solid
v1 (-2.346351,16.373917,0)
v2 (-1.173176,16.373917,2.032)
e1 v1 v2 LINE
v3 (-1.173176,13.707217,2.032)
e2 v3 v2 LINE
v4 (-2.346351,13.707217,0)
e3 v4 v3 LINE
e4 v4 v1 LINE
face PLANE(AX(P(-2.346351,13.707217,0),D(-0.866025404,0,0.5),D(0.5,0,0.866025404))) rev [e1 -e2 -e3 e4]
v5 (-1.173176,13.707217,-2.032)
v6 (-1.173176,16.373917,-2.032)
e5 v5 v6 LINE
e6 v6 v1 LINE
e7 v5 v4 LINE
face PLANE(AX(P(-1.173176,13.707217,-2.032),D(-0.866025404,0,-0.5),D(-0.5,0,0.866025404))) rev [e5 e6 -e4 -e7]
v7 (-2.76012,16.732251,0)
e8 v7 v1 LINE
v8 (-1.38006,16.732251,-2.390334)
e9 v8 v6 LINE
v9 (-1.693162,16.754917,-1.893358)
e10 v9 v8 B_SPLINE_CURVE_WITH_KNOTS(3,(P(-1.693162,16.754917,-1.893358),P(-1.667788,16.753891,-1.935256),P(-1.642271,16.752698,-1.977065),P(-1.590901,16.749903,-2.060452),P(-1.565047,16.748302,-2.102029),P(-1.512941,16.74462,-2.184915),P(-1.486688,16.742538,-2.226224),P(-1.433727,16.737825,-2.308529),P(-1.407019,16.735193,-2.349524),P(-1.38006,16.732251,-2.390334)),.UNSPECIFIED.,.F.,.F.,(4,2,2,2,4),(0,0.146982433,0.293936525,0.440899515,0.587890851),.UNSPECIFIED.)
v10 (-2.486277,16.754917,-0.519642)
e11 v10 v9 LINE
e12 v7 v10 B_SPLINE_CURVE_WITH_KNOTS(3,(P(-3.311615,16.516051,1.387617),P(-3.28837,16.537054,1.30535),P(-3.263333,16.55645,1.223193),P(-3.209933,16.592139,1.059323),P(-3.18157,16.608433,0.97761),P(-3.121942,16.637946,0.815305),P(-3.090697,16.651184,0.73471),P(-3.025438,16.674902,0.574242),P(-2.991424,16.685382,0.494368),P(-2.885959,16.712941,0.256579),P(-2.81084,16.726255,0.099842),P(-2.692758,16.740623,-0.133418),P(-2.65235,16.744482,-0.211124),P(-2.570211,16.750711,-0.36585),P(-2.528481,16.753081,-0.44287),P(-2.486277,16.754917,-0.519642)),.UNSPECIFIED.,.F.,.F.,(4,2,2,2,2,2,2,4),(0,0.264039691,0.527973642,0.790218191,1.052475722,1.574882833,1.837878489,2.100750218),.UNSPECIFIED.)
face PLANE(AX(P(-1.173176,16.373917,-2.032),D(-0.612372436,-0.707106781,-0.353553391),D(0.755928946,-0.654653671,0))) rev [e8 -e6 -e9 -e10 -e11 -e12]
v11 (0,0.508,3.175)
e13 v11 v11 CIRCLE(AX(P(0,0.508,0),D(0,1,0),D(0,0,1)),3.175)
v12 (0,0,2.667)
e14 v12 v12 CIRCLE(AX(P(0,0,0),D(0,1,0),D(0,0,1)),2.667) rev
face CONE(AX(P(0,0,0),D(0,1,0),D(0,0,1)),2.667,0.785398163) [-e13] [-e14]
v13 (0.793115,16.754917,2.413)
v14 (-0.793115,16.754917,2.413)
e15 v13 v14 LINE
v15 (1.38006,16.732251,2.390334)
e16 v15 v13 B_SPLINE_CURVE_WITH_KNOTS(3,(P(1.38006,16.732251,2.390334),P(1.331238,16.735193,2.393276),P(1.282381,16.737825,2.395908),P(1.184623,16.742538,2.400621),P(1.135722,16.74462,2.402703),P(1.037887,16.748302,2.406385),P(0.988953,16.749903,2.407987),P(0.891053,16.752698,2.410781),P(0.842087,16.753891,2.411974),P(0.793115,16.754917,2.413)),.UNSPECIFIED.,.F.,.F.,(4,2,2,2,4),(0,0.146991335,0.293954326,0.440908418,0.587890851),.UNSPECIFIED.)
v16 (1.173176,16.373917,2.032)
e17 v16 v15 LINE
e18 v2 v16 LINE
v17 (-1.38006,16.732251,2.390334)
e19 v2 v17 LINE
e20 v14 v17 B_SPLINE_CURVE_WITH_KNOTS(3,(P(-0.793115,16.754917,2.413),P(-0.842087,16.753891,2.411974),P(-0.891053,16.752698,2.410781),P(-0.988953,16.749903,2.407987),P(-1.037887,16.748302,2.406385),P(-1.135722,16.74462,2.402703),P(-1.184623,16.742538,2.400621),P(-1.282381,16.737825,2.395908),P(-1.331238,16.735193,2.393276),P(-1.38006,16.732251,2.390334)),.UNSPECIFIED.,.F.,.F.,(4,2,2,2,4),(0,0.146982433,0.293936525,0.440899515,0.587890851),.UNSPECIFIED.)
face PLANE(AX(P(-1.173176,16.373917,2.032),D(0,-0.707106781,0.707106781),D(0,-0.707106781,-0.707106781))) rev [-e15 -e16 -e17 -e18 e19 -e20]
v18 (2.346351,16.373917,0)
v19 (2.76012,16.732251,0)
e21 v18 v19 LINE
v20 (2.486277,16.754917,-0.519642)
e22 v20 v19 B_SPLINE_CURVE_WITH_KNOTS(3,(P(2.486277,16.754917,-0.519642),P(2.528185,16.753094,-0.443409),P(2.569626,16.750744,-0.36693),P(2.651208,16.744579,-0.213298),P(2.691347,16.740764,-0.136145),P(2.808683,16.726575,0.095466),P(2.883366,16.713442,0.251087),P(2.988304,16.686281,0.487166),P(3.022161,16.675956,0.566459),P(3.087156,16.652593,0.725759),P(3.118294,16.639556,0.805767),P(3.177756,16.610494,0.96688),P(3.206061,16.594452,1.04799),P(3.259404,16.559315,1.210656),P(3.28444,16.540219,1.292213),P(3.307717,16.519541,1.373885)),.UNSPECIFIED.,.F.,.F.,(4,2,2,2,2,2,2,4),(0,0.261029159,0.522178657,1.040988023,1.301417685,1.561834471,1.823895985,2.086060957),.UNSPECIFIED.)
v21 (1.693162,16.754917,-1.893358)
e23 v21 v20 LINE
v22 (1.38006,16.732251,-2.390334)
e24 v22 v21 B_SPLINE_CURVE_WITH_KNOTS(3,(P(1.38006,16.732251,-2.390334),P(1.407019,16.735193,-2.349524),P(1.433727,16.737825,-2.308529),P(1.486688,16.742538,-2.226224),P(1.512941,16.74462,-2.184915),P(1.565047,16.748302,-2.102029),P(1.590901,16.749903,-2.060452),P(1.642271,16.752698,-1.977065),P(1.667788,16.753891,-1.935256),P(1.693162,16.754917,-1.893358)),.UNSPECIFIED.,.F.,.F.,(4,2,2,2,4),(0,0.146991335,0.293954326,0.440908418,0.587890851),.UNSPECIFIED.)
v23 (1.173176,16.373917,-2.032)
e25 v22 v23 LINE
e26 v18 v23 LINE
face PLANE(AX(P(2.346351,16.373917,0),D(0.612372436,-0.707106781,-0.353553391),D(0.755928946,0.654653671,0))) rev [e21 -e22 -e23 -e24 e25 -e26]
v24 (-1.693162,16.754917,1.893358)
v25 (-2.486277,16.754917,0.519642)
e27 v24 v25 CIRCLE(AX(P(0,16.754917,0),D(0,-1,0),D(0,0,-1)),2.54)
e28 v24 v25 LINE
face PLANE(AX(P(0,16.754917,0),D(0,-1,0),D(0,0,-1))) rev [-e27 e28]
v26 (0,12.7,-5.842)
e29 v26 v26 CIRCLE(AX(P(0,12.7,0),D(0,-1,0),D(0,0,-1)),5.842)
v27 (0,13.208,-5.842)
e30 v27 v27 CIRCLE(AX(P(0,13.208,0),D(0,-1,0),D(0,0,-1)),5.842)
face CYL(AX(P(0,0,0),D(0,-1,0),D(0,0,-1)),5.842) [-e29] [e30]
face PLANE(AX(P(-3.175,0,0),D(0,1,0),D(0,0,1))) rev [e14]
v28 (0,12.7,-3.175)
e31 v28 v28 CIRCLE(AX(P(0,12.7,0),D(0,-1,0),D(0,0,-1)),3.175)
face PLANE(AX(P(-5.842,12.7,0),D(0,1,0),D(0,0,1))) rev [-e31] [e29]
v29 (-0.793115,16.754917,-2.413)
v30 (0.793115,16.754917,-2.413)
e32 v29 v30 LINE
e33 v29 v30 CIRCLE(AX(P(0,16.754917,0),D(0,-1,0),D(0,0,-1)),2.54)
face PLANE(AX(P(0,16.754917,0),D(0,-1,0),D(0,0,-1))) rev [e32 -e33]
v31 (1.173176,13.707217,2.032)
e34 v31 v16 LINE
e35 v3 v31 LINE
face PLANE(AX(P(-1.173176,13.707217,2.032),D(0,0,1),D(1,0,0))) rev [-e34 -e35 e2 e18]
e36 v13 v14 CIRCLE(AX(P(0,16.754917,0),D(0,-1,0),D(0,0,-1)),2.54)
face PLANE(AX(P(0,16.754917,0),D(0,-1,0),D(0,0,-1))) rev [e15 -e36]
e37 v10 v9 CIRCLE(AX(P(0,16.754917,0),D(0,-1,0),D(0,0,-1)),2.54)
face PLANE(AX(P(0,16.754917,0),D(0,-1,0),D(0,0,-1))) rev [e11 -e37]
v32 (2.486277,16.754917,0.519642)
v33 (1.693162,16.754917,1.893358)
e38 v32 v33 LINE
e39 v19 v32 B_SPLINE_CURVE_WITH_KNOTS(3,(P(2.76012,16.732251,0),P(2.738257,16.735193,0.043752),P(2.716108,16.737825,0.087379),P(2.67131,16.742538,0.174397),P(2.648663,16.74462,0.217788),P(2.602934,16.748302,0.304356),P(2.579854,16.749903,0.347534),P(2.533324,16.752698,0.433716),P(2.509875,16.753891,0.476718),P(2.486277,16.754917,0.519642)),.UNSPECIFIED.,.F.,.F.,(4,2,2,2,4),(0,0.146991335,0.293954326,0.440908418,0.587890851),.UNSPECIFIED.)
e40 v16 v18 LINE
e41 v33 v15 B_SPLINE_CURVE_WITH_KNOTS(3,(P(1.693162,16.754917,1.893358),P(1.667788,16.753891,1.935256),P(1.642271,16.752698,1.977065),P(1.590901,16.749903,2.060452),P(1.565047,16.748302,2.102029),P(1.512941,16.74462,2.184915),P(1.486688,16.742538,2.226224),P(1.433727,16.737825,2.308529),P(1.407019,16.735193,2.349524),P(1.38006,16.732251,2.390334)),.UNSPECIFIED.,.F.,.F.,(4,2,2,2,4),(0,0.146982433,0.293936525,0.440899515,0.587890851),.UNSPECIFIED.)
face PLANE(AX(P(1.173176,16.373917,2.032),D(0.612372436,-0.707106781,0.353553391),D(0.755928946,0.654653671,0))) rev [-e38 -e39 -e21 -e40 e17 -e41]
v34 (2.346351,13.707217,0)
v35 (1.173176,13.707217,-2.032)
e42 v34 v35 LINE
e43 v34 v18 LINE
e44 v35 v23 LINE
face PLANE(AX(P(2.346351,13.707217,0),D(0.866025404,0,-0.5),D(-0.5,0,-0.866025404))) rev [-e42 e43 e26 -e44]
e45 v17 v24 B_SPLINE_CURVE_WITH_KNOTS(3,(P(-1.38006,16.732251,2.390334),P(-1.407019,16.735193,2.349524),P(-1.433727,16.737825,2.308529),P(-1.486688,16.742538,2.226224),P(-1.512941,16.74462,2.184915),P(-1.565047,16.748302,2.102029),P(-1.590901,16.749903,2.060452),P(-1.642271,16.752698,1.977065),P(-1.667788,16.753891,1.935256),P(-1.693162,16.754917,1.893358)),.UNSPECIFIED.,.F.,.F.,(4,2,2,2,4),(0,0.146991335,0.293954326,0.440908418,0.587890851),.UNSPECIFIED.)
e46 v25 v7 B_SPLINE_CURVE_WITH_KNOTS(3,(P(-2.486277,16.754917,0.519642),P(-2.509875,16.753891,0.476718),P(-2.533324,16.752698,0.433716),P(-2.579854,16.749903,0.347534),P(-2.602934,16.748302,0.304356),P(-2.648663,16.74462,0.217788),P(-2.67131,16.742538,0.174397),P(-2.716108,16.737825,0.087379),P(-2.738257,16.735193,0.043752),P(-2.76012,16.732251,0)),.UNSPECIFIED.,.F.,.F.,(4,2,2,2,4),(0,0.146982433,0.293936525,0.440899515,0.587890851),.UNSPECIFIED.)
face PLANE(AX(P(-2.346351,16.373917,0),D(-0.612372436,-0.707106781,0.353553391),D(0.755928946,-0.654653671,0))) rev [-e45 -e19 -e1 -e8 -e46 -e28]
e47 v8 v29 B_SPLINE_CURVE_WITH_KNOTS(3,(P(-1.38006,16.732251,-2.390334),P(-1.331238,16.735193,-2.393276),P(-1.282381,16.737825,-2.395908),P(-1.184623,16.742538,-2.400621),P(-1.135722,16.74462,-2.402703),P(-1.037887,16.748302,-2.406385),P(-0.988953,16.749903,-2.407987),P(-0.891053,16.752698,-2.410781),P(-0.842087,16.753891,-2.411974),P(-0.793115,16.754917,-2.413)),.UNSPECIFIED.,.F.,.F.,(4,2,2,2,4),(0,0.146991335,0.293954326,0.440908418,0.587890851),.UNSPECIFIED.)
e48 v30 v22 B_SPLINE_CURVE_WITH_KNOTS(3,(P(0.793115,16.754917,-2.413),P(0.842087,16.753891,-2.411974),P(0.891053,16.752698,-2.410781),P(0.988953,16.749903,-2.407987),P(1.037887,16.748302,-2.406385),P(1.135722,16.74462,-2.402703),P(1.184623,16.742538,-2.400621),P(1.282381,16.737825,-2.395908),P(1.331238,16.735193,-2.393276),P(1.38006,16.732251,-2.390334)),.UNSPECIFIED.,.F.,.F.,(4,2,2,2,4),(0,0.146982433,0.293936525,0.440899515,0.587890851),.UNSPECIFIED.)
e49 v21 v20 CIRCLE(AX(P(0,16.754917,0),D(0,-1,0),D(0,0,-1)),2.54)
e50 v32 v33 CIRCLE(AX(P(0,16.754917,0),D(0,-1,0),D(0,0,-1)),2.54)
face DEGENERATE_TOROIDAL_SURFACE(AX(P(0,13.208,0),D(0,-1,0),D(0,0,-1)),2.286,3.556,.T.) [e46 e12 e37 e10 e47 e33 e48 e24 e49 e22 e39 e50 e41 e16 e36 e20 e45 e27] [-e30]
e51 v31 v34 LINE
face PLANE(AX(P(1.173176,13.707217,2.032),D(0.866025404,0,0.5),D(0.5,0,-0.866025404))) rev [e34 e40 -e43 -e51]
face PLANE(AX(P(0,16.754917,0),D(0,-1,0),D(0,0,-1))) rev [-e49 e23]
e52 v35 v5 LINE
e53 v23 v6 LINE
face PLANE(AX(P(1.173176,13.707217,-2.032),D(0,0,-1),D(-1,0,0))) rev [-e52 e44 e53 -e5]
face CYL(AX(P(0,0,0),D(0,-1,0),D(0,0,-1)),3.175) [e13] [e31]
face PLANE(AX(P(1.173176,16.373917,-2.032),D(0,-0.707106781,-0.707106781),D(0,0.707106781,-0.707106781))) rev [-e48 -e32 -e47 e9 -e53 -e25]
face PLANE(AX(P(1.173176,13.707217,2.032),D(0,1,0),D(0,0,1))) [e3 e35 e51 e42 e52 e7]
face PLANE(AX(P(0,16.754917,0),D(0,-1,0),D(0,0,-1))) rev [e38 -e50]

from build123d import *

# Parameters (mm, degrees)
EXTRUDE1_DEPTH = 3.0477
CHAMFER1_SIZE  = 0.381
CHAMFER2_SIZE  = 0.381
CHAMFER3_SIZE  = 0.508


with BuildPart() as part:
    # Sketch1 → Revolve1 (revolve)
    with BuildSketch(Plane.XY, mode=Mode.PRIVATE) as revolve1_sk:
        with BuildLine():
            Line((0, 16.754916971), (-2.54, 16.754916971))
            ThreePointArc((-2.54, 16.754916971), (-4.888725495, 15.631005572), (-5.842, 13.208))
            Line((-5.842, 13.208), (-5.842, 12.7))
            Line((-5.842, 12.7), (-3.175, 12.7))
            Line((-3.175, 12.7), (-3.175, 0))
            Line((-3.175, 0), (0, 0))
            Line((0, 0), (0, 16.754916971))
        make_face()
    revolve(revolve1_sk.sketch.rotate(Axis((0, 0, 0), (0, 1, 0)), 270), axis=Axis((0, 0, 0), (0, 1, 0)))

    # Sketch2 → Extrude1 (cut)
    with BuildSketch(Plane(origin=(0, 16.754916971, 0), x_dir=(1, 0, 0), z_dir=(0, 1, 0))):
        Polygon((1.173175747, -2.032), (2.346351494, 0), (1.173175747, 2.032), (-1.173175747, 2.032), (-2.346351494, 0), (-1.173175747, -2.032), align=None)
    extrude(amount=-EXTRUDE1_DEPTH, mode=Mode.SUBTRACT)

    # Chamfer1
    # the kernel refuses this chamfer: 0.381 mm, written as the material it takes off along each edge
    with BuildSketch(Plane(origin=(2.836257103, 16.754916971, 0.848541406), x_dir=(0.8656979742248802, 0.02749587661058275, -0.4998109584556487), z_dir=(-0.5000000000000003, 0, -0.8660254037844386))) as chamfer1_piece_1_section:
        Polygon((CHAMFER1_SIZE * 0.999621916911, CHAMFER1_SIZE * 0.0274958766106), (-CHAMFER1_SIZE * 0.0274958766106, CHAMFER1_SIZE * 0.999621916911), (0, 0), align=None)
    chamfer1_piece_1 = extrude(amount=4.305973931, mode=Mode.PRIVATE)
    chamfer1_piece_1 = split(chamfer1_piece_1, bisect_by=Plane(origin=(1.86439326, 16.626680536, -2.032), z_dir=(0, 0, 1)), keep=Keep.TOP, mode=Mode.PRIVATE)
    chamfer1_piece_1 = split(chamfer1_piece_1, bisect_by=Plane(origin=(2.691960251, 16.626680536, -0.598611926), z_dir=(-0.8660254037844386, 0, -0.5000000000000002)), keep=Keep.TOP, mode=Mode.PRIVATE)
    add(chamfer1_piece_1, mode=Mode.SUBTRACT)
    with BuildSketch(Plane(origin=(2.152986965, 16.754916971, -2.032), x_dir=(0, 0.027495876610582747, -0.9996219169112968), z_dir=(-1, 0, 0))) as chamfer1_piece_2_section:
        Polygon((CHAMFER1_SIZE * 0.999621916911, CHAMFER1_SIZE * 0.0274958766106), (-CHAMFER1_SIZE * 0.0274958766106, CHAMFER1_SIZE * 0.999621916911), (0, 0), align=None)
    chamfer1_piece_2 = extrude(amount=4.305973931, mode=Mode.PRIVATE)
    chamfer1_piece_2 = split(chamfer1_piece_2, bisect_by=Plane(origin=(-0.82756699, 16.626680536, -2.630611926), z_dir=(0.8660254037844386, 0, 0.5000000000000001)), keep=Keep.TOP, mode=Mode.PRIVATE)
    chamfer1_piece_2 = split(chamfer1_piece_2, bisect_by=Plane(origin=(0.82756699, 16.626680536, -2.630611926), z_dir=(-0.8660254037844387, 0, 0.5000000000000003)), keep=Keep.TOP, mode=Mode.PRIVATE)
    add(chamfer1_piece_2, mode=Mode.SUBTRACT)
    with BuildSketch(Plane(origin=(-0.683270138, 16.754916971, -2.880541406), x_dir=(-0.8656979742248804, 0.02749587661058275, -0.4998109584556485), z_dir=(-0.5000000000000001, 0, 0.8660254037844386))) as chamfer1_piece_3_section:
        Polygon((CHAMFER1_SIZE * 0.999621916911, CHAMFER1_SIZE * 0.0274958766106), (-CHAMFER1_SIZE * 0.0274958766106, CHAMFER1_SIZE * 0.999621916911), (0, 0), align=None)
    chamfer1_piece_3 = extrude(amount=4.305973931, mode=Mode.PRIVATE)
    chamfer1_piece_3 = split(chamfer1_piece_3, bisect_by=Plane(origin=(-2.691960251, 16.626680536, -0.598611926), z_dir=(0.8660254037844387, 0, -0.5000000000000001)), keep=Keep.TOP, mode=Mode.PRIVATE)
    chamfer1_piece_3 = split(chamfer1_piece_3, bisect_by=Plane(origin=(-1.86439326, 16.626680536, -2.032), z_dir=(0, 0, 1)), keep=Keep.TOP, mode=Mode.PRIVATE)
    add(chamfer1_piece_3, mode=Mode.SUBTRACT)
    with BuildSketch(Plane(origin=(2.152986965, 16.754916971, -2.032), x_dir=(0, 0.027495876610582747, -0.9996219169112968), z_dir=(-1, 0, 0))) as chamfer1_piece_4a_section:
        Polygon((CHAMFER1_SIZE * 0.999621916911, CHAMFER1_SIZE * 0.0274958766106), (-CHAMFER1_SIZE * 0.0274958766106, CHAMFER1_SIZE * 0.999621916911), (0, 0), align=None)
    chamfer1_piece_4a = extrude(amount=4.305973931, mode=Mode.PRIVATE)
    chamfer1_piece_4a = split(chamfer1_piece_4a, bisect_by=Plane(origin=(1.229620554, 16.631969248, -1.934234726), z_dir=(0.8660254037844387, 0, -0.5000000000000003)), keep=Keep.TOP, mode=Mode.PRIVATE)
    with BuildSketch(Plane(origin=(2.836257103, 16.754916971, 0.848541406), x_dir=(0.8656979742248802, 0.02749587661058275, -0.4998109584556487), z_dir=(-0.5000000000000003, 0, -0.8660254037844386))) as chamfer1_piece_4b_section:
        Polygon((CHAMFER1_SIZE * 0.999621916911, CHAMFER1_SIZE * 0.0274958766106), (-CHAMFER1_SIZE * 0.0274958766106, CHAMFER1_SIZE * 0.999621916911), (0, 0), align=None)
    chamfer1_piece_4b = extrude(amount=4.305973931, mode=Mode.PRIVATE)
    chamfer1_piece_4b = split(chamfer1_piece_4b, bisect_by=Plane(origin=(1.060286133, 16.631969248, -2.032), z_dir=(0, 0, -1)), keep=Keep.TOP, mode=Mode.PRIVATE)
    chamfer1_piece_4 = chamfer1_piece_4a & chamfer1_piece_4b
    add(chamfer1_piece_4, mode=Mode.SUBTRACT)
    with BuildSketch(Plane(origin=(-0.683270138, 16.754916971, -2.880541406), x_dir=(-0.8656979742248804, 0.02749587661058275, -0.4998109584556485), z_dir=(-0.5000000000000001, 0, 0.8660254037844386))) as chamfer1_piece_5a_section:
        Polygon((CHAMFER1_SIZE * 0.999621916911, CHAMFER1_SIZE * 0.0274958766106), (-CHAMFER1_SIZE * 0.0274958766106, CHAMFER1_SIZE * 0.999621916911), (0, 0), align=None)
    chamfer1_piece_5a = extrude(amount=4.305973931, mode=Mode.PRIVATE)
    chamfer1_piece_5a = split(chamfer1_piece_5a, bisect_by=Plane(origin=(-1.060286133, 16.631969248, -2.032), z_dir=(0, 0, -1)), keep=Keep.TOP, mode=Mode.PRIVATE)
    with BuildSketch(Plane(origin=(2.152986965, 16.754916971, -2.032), x_dir=(0, 0.027495876610582747, -0.9996219169112968), z_dir=(-1, 0, 0))) as chamfer1_piece_5b_section:
        Polygon((CHAMFER1_SIZE * 0.999621916911, CHAMFER1_SIZE * 0.0274958766106), (-CHAMFER1_SIZE * 0.0274958766106, CHAMFER1_SIZE * 0.999621916911), (0, 0), align=None)
    chamfer1_piece_5b = extrude(amount=4.305973931, mode=Mode.PRIVATE)
    chamfer1_piece_5b = split(chamfer1_piece_5b, bisect_by=Plane(origin=(-1.229620554, 16.631969248, -1.934234726), z_dir=(-0.8660254037844386, 0, -0.5000000000000001)), keep=Keep.TOP, mode=Mode.PRIVATE)
    chamfer1_piece_5 = chamfer1_piece_5a & chamfer1_piece_5b
    add(chamfer1_piece_5, mode=Mode.SUBTRACT)

    # Chamfer2
    # the kernel refuses this chamfer: 0.381 mm, written as the material it takes off along each edge
    with BuildSketch(Plane(origin=(3.01166923, 16.754916971, -1.152364121), x_dir=(-0.02381212764409397, -0.9996219169112966, -0.013747938305285933), z_dir=(-0.4999999999999081, 5.2687907827436646e-15, 0.8660254037844918))) as chamfer2_piece_1_section:
        Polygon((CHAMFER2_SIZE * 0.999621916911, CHAMFER2_SIZE * 0.0274958766106), (-CHAMFER2_SIZE * 0.0274958766106, CHAMFER2_SIZE * 0.999621916911), (0, 0), align=None)
    chamfer2_piece_1 = extrude(amount=4.656798184, mode=Mode.PRIVATE)
    chamfer2_piece_1 = split(chamfer2_piece_1, bisect_by=Plane(origin=(2.577265725, 16.592496514, -0.037203907), z_dir=(-0.6123724356959522, 0.7071067811862759, 0.35355339059354396)), keep=Keep.TOP, mode=Mode.PRIVATE)
    chamfer2_piece_1 = split(chamfer2_piece_1, bisect_by=Plane(origin=(2.387970288, 16.665356362, 0.072085865), z_dir=(0.8660254037844386, 0, -0.5000000000000003)), keep=Keep.TOP, mode=Mode.PRIVATE)
    add(chamfer2_piece_1, mode=Mode.SUBTRACT)
    with BuildSketch(Plane(origin=(3.01166923, 16.754916971, -1.152364121), x_dir=(-0.02381212764409397, -0.9996219169112966, -0.013747938305285933), z_dir=(-0.4999999999999081, 5.2687907827436646e-15, 0.8660254037844918))) as chamfer2_piece_2_section:
        Polygon((CHAMFER2_SIZE * 0.999621916911, CHAMFER2_SIZE * 0.0274958766106), (-CHAMFER2_SIZE * 0.0274958766106, CHAMFER2_SIZE * 0.999621916911), (0, 0), align=None)
    chamfer2_piece_2 = extrude(amount=4.656798184, mode=Mode.PRIVATE)
    chamfer2_piece_2 = split(chamfer2_piece_2, bisect_by=Plane(origin=(2.691961715, 16.626681616, 0.598614463), z_dir=(-0.8660254037844386, 0, 0.5000000000000003)), keep=Keep.TOP, mode=Mode.PRIVATE)
    chamfer2_piece_2 = split(chamfer2_piece_2, bisect_by=Plane(origin=(1.864391291, 16.626681616, 2.032), z_dir=(0, 0, -1)), keep=Keep.TOP, mode=Mode.PRIVATE)
    add(chamfer2_piece_2, mode=Mode.SUBTRACT)
    with BuildSketch(Plane(origin=(-2.152986965, 16.754916971, 2.032), x_dir=(0, 0.027495876610582747, 0.9996219169112968), z_dir=(1, 0, 0))) as chamfer2_piece_3_section:
        Polygon((CHAMFER2_SIZE * 0.999621916911, CHAMFER2_SIZE * 0.0274958766106), (-CHAMFER2_SIZE * 0.0274958766106, CHAMFER2_SIZE * 0.999621916911), (0, 0), align=None)
    chamfer2_piece_3 = extrude(amount=4.305973931, mode=Mode.PRIVATE)
    chamfer2_piece_3 = split(chamfer2_piece_3, bisect_by=Plane(origin=(0.82756699, 16.626680536, 2.630611926), z_dir=(-0.866025403784329, 0, -0.50000000000019)), keep=Keep.TOP, mode=Mode.PRIVATE)
    chamfer2_piece_3 = split(chamfer2_piece_3, bisect_by=Plane(origin=(-0.82756699, 16.626680536, 2.630611926), z_dir=(0.866025403784329, 0, -0.50000000000019)), keep=Keep.TOP, mode=Mode.PRIVATE)
    add(chamfer2_piece_3, mode=Mode.SUBTRACT)
    with BuildSketch(Plane(origin=(-0.683270138, 16.754916971, 2.880541406), x_dir=(-0.8656979742249333, 0.02749587661058274, 0.4998109584555566), z_dir=(-0.49999999999990835, -5.268790782743671e-15, -0.8660254037844917))) as chamfer2_piece_4_section:
        Polygon((CHAMFER2_SIZE * 0.999621916911, -CHAMFER2_SIZE * 0.0274958766106), (-CHAMFER2_SIZE * 0.0274958766106, -CHAMFER2_SIZE * 0.999621916911), (0, 0), align=None)
    chamfer2_piece_4 = extrude(amount=4.656798184, mode=Mode.PRIVATE)
    chamfer2_piece_4 = split(chamfer2_piece_4, bisect_by=Plane(origin=(-1.864391291, 16.626681616, 2.032), z_dir=(0, 0, -1)), keep=Keep.TOP, mode=Mode.PRIVATE)
    chamfer2_piece_4 = split(chamfer2_piece_4, bisect_by=Plane(origin=(-2.691961715, 16.626681616, 0.598614463), z_dir=(0.866025403784329, 0, 0.50000000000019)), keep=Keep.TOP, mode=Mode.PRIVATE)
    add(chamfer2_piece_4, mode=Mode.SUBTRACT)
    with BuildSketch(Plane(origin=(-0.683270138, 16.754916971, 2.880541406), x_dir=(-0.8656979742249333, 0.02749587661058274, 0.4998109584555566), z_dir=(-0.49999999999990835, -5.268790782743671e-15, -0.8660254037844917))) as chamfer2_piece_5_section:
        Polygon((CHAMFER2_SIZE * 0.999621916911, -CHAMFER2_SIZE * 0.0274958766106), (-CHAMFER2_SIZE * 0.0274958766106, -CHAMFER2_SIZE * 0.999621916911), (0, 0), align=None)
    chamfer2_piece_5 = extrude(amount=4.656798184, mode=Mode.PRIVATE)
    chamfer2_piece_5 = split(chamfer2_piece_5, bisect_by=Plane(origin=(-2.387970288, 16.665356362, 0.072085865), z_dir=(-0.866025403784329, 0, -0.50000000000019)), keep=Keep.TOP, mode=Mode.PRIVATE)
    chamfer2_piece_5 = split(chamfer2_piece_5, bisect_by=Plane(origin=(-2.577265725, 16.592496514, -0.037203907), z_dir=(0.6123724356959522, 0.7071067811862759, 0.35355339059354396)), keep=Keep.TOP, mode=Mode.PRIVATE)
    add(chamfer2_piece_5, mode=Mode.SUBTRACT)
    with BuildSketch(Plane(origin=(3.01166923, 16.754916971, -1.152364121), x_dir=(-0.02381212764409397, -0.9996219169112966, -0.013747938305285933), z_dir=(-0.4999999999999081, 5.2687907827436646e-15, 0.8660254037844918))) as chamfer2_piece_6a_section:
        Polygon((CHAMFER2_SIZE * 0.999621916911, CHAMFER2_SIZE * 0.0274958766106), (-CHAMFER2_SIZE * 0.0274958766106, CHAMFER2_SIZE * 0.999621916911), (0, 0), align=None)
    chamfer2_piece_6a = extrude(amount=4.656798184, mode=Mode.PRIVATE)
    chamfer2_piece_6a = split(chamfer2_piece_6a, bisect_by=Plane(origin=(1.060286133, 16.631969248, 2.032), z_dir=(0, 0, 1)), keep=Keep.TOP, mode=Mode.PRIVATE)
    with BuildSketch(Plane(origin=(-2.152986965, 16.754916971, 2.032), x_dir=(0, 0.027495876610582747, 0.9996219169112968), z_dir=(1, 0, 0))) as chamfer2_piece_6b_section:
        Polygon((CHAMFER2_SIZE * 0.999621916911, CHAMFER2_SIZE * 0.0274958766106), (-CHAMFER2_SIZE * 0.0274958766106, CHAMFER2_SIZE * 0.999621916911), (0, 0), align=None)
    chamfer2_piece_6b = extrude(amount=4.305973931, mode=Mode.PRIVATE)
    chamfer2_piece_6b = split(chamfer2_piece_6b, bisect_by=Plane(origin=(1.229620554, 16.631969248, 1.934234726), z_dir=(0.866025403784329, 0, 0.50000000000019)), keep=Keep.TOP, mode=Mode.PRIVATE)
    chamfer2_piece_6 = chamfer2_piece_6a & chamfer2_piece_6b
    add(chamfer2_piece_6, mode=Mode.SUBTRACT)
    with BuildSketch(Plane(origin=(-0.683270138, 16.754916971, 2.880541406), x_dir=(-0.8656979742249333, 0.02749587661058274, 0.4998109584555566), z_dir=(-0.49999999999990835, -5.268790782743671e-15, -0.8660254037844917))) as chamfer2_piece_7a_section:
        Polygon((CHAMFER2_SIZE * 0.999621916911, -CHAMFER2_SIZE * 0.0274958766106), (-CHAMFER2_SIZE * 0.0274958766106, -CHAMFER2_SIZE * 0.999621916911), (0, 0), align=None)
    chamfer2_piece_7a = extrude(amount=4.656798184, mode=Mode.PRIVATE)
    chamfer2_piece_7a = split(chamfer2_piece_7a, bisect_by=Plane(origin=(-1.060286133, 16.631969248, 2.032), z_dir=(0, 0, 1)), keep=Keep.TOP, mode=Mode.PRIVATE)
    with BuildSketch(Plane(origin=(-2.152986965, 16.754916971, 2.032), x_dir=(0, 0.027495876610582747, 0.9996219169112968), z_dir=(1, 0, 0))) as chamfer2_piece_7b_section:
        Polygon((CHAMFER2_SIZE * 0.999621916911, CHAMFER2_SIZE * 0.0274958766106), (-CHAMFER2_SIZE * 0.0274958766106, CHAMFER2_SIZE * 0.999621916911), (0, 0), align=None)
    chamfer2_piece_7b = extrude(amount=4.305973931, mode=Mode.PRIVATE)
    chamfer2_piece_7b = split(chamfer2_piece_7b, bisect_by=Plane(origin=(-1.229620554, 16.631969248, 1.934234726), z_dir=(-0.866025403784329, 0, 0.50000000000019)), keep=Keep.TOP, mode=Mode.PRIVATE)
    chamfer2_piece_7 = chamfer2_piece_7a & chamfer2_piece_7b
    add(chamfer2_piece_7, mode=Mode.SUBTRACT)

    # Chamfer3
    chamfer3_edges = [part.edges().sort_by_distance(p)[0] for p in [
        (0, 0, 3.175),
    ]]
    chamfer(chamfer3_edges, length=CHAMFER3_SIZE)


solid = part.part
